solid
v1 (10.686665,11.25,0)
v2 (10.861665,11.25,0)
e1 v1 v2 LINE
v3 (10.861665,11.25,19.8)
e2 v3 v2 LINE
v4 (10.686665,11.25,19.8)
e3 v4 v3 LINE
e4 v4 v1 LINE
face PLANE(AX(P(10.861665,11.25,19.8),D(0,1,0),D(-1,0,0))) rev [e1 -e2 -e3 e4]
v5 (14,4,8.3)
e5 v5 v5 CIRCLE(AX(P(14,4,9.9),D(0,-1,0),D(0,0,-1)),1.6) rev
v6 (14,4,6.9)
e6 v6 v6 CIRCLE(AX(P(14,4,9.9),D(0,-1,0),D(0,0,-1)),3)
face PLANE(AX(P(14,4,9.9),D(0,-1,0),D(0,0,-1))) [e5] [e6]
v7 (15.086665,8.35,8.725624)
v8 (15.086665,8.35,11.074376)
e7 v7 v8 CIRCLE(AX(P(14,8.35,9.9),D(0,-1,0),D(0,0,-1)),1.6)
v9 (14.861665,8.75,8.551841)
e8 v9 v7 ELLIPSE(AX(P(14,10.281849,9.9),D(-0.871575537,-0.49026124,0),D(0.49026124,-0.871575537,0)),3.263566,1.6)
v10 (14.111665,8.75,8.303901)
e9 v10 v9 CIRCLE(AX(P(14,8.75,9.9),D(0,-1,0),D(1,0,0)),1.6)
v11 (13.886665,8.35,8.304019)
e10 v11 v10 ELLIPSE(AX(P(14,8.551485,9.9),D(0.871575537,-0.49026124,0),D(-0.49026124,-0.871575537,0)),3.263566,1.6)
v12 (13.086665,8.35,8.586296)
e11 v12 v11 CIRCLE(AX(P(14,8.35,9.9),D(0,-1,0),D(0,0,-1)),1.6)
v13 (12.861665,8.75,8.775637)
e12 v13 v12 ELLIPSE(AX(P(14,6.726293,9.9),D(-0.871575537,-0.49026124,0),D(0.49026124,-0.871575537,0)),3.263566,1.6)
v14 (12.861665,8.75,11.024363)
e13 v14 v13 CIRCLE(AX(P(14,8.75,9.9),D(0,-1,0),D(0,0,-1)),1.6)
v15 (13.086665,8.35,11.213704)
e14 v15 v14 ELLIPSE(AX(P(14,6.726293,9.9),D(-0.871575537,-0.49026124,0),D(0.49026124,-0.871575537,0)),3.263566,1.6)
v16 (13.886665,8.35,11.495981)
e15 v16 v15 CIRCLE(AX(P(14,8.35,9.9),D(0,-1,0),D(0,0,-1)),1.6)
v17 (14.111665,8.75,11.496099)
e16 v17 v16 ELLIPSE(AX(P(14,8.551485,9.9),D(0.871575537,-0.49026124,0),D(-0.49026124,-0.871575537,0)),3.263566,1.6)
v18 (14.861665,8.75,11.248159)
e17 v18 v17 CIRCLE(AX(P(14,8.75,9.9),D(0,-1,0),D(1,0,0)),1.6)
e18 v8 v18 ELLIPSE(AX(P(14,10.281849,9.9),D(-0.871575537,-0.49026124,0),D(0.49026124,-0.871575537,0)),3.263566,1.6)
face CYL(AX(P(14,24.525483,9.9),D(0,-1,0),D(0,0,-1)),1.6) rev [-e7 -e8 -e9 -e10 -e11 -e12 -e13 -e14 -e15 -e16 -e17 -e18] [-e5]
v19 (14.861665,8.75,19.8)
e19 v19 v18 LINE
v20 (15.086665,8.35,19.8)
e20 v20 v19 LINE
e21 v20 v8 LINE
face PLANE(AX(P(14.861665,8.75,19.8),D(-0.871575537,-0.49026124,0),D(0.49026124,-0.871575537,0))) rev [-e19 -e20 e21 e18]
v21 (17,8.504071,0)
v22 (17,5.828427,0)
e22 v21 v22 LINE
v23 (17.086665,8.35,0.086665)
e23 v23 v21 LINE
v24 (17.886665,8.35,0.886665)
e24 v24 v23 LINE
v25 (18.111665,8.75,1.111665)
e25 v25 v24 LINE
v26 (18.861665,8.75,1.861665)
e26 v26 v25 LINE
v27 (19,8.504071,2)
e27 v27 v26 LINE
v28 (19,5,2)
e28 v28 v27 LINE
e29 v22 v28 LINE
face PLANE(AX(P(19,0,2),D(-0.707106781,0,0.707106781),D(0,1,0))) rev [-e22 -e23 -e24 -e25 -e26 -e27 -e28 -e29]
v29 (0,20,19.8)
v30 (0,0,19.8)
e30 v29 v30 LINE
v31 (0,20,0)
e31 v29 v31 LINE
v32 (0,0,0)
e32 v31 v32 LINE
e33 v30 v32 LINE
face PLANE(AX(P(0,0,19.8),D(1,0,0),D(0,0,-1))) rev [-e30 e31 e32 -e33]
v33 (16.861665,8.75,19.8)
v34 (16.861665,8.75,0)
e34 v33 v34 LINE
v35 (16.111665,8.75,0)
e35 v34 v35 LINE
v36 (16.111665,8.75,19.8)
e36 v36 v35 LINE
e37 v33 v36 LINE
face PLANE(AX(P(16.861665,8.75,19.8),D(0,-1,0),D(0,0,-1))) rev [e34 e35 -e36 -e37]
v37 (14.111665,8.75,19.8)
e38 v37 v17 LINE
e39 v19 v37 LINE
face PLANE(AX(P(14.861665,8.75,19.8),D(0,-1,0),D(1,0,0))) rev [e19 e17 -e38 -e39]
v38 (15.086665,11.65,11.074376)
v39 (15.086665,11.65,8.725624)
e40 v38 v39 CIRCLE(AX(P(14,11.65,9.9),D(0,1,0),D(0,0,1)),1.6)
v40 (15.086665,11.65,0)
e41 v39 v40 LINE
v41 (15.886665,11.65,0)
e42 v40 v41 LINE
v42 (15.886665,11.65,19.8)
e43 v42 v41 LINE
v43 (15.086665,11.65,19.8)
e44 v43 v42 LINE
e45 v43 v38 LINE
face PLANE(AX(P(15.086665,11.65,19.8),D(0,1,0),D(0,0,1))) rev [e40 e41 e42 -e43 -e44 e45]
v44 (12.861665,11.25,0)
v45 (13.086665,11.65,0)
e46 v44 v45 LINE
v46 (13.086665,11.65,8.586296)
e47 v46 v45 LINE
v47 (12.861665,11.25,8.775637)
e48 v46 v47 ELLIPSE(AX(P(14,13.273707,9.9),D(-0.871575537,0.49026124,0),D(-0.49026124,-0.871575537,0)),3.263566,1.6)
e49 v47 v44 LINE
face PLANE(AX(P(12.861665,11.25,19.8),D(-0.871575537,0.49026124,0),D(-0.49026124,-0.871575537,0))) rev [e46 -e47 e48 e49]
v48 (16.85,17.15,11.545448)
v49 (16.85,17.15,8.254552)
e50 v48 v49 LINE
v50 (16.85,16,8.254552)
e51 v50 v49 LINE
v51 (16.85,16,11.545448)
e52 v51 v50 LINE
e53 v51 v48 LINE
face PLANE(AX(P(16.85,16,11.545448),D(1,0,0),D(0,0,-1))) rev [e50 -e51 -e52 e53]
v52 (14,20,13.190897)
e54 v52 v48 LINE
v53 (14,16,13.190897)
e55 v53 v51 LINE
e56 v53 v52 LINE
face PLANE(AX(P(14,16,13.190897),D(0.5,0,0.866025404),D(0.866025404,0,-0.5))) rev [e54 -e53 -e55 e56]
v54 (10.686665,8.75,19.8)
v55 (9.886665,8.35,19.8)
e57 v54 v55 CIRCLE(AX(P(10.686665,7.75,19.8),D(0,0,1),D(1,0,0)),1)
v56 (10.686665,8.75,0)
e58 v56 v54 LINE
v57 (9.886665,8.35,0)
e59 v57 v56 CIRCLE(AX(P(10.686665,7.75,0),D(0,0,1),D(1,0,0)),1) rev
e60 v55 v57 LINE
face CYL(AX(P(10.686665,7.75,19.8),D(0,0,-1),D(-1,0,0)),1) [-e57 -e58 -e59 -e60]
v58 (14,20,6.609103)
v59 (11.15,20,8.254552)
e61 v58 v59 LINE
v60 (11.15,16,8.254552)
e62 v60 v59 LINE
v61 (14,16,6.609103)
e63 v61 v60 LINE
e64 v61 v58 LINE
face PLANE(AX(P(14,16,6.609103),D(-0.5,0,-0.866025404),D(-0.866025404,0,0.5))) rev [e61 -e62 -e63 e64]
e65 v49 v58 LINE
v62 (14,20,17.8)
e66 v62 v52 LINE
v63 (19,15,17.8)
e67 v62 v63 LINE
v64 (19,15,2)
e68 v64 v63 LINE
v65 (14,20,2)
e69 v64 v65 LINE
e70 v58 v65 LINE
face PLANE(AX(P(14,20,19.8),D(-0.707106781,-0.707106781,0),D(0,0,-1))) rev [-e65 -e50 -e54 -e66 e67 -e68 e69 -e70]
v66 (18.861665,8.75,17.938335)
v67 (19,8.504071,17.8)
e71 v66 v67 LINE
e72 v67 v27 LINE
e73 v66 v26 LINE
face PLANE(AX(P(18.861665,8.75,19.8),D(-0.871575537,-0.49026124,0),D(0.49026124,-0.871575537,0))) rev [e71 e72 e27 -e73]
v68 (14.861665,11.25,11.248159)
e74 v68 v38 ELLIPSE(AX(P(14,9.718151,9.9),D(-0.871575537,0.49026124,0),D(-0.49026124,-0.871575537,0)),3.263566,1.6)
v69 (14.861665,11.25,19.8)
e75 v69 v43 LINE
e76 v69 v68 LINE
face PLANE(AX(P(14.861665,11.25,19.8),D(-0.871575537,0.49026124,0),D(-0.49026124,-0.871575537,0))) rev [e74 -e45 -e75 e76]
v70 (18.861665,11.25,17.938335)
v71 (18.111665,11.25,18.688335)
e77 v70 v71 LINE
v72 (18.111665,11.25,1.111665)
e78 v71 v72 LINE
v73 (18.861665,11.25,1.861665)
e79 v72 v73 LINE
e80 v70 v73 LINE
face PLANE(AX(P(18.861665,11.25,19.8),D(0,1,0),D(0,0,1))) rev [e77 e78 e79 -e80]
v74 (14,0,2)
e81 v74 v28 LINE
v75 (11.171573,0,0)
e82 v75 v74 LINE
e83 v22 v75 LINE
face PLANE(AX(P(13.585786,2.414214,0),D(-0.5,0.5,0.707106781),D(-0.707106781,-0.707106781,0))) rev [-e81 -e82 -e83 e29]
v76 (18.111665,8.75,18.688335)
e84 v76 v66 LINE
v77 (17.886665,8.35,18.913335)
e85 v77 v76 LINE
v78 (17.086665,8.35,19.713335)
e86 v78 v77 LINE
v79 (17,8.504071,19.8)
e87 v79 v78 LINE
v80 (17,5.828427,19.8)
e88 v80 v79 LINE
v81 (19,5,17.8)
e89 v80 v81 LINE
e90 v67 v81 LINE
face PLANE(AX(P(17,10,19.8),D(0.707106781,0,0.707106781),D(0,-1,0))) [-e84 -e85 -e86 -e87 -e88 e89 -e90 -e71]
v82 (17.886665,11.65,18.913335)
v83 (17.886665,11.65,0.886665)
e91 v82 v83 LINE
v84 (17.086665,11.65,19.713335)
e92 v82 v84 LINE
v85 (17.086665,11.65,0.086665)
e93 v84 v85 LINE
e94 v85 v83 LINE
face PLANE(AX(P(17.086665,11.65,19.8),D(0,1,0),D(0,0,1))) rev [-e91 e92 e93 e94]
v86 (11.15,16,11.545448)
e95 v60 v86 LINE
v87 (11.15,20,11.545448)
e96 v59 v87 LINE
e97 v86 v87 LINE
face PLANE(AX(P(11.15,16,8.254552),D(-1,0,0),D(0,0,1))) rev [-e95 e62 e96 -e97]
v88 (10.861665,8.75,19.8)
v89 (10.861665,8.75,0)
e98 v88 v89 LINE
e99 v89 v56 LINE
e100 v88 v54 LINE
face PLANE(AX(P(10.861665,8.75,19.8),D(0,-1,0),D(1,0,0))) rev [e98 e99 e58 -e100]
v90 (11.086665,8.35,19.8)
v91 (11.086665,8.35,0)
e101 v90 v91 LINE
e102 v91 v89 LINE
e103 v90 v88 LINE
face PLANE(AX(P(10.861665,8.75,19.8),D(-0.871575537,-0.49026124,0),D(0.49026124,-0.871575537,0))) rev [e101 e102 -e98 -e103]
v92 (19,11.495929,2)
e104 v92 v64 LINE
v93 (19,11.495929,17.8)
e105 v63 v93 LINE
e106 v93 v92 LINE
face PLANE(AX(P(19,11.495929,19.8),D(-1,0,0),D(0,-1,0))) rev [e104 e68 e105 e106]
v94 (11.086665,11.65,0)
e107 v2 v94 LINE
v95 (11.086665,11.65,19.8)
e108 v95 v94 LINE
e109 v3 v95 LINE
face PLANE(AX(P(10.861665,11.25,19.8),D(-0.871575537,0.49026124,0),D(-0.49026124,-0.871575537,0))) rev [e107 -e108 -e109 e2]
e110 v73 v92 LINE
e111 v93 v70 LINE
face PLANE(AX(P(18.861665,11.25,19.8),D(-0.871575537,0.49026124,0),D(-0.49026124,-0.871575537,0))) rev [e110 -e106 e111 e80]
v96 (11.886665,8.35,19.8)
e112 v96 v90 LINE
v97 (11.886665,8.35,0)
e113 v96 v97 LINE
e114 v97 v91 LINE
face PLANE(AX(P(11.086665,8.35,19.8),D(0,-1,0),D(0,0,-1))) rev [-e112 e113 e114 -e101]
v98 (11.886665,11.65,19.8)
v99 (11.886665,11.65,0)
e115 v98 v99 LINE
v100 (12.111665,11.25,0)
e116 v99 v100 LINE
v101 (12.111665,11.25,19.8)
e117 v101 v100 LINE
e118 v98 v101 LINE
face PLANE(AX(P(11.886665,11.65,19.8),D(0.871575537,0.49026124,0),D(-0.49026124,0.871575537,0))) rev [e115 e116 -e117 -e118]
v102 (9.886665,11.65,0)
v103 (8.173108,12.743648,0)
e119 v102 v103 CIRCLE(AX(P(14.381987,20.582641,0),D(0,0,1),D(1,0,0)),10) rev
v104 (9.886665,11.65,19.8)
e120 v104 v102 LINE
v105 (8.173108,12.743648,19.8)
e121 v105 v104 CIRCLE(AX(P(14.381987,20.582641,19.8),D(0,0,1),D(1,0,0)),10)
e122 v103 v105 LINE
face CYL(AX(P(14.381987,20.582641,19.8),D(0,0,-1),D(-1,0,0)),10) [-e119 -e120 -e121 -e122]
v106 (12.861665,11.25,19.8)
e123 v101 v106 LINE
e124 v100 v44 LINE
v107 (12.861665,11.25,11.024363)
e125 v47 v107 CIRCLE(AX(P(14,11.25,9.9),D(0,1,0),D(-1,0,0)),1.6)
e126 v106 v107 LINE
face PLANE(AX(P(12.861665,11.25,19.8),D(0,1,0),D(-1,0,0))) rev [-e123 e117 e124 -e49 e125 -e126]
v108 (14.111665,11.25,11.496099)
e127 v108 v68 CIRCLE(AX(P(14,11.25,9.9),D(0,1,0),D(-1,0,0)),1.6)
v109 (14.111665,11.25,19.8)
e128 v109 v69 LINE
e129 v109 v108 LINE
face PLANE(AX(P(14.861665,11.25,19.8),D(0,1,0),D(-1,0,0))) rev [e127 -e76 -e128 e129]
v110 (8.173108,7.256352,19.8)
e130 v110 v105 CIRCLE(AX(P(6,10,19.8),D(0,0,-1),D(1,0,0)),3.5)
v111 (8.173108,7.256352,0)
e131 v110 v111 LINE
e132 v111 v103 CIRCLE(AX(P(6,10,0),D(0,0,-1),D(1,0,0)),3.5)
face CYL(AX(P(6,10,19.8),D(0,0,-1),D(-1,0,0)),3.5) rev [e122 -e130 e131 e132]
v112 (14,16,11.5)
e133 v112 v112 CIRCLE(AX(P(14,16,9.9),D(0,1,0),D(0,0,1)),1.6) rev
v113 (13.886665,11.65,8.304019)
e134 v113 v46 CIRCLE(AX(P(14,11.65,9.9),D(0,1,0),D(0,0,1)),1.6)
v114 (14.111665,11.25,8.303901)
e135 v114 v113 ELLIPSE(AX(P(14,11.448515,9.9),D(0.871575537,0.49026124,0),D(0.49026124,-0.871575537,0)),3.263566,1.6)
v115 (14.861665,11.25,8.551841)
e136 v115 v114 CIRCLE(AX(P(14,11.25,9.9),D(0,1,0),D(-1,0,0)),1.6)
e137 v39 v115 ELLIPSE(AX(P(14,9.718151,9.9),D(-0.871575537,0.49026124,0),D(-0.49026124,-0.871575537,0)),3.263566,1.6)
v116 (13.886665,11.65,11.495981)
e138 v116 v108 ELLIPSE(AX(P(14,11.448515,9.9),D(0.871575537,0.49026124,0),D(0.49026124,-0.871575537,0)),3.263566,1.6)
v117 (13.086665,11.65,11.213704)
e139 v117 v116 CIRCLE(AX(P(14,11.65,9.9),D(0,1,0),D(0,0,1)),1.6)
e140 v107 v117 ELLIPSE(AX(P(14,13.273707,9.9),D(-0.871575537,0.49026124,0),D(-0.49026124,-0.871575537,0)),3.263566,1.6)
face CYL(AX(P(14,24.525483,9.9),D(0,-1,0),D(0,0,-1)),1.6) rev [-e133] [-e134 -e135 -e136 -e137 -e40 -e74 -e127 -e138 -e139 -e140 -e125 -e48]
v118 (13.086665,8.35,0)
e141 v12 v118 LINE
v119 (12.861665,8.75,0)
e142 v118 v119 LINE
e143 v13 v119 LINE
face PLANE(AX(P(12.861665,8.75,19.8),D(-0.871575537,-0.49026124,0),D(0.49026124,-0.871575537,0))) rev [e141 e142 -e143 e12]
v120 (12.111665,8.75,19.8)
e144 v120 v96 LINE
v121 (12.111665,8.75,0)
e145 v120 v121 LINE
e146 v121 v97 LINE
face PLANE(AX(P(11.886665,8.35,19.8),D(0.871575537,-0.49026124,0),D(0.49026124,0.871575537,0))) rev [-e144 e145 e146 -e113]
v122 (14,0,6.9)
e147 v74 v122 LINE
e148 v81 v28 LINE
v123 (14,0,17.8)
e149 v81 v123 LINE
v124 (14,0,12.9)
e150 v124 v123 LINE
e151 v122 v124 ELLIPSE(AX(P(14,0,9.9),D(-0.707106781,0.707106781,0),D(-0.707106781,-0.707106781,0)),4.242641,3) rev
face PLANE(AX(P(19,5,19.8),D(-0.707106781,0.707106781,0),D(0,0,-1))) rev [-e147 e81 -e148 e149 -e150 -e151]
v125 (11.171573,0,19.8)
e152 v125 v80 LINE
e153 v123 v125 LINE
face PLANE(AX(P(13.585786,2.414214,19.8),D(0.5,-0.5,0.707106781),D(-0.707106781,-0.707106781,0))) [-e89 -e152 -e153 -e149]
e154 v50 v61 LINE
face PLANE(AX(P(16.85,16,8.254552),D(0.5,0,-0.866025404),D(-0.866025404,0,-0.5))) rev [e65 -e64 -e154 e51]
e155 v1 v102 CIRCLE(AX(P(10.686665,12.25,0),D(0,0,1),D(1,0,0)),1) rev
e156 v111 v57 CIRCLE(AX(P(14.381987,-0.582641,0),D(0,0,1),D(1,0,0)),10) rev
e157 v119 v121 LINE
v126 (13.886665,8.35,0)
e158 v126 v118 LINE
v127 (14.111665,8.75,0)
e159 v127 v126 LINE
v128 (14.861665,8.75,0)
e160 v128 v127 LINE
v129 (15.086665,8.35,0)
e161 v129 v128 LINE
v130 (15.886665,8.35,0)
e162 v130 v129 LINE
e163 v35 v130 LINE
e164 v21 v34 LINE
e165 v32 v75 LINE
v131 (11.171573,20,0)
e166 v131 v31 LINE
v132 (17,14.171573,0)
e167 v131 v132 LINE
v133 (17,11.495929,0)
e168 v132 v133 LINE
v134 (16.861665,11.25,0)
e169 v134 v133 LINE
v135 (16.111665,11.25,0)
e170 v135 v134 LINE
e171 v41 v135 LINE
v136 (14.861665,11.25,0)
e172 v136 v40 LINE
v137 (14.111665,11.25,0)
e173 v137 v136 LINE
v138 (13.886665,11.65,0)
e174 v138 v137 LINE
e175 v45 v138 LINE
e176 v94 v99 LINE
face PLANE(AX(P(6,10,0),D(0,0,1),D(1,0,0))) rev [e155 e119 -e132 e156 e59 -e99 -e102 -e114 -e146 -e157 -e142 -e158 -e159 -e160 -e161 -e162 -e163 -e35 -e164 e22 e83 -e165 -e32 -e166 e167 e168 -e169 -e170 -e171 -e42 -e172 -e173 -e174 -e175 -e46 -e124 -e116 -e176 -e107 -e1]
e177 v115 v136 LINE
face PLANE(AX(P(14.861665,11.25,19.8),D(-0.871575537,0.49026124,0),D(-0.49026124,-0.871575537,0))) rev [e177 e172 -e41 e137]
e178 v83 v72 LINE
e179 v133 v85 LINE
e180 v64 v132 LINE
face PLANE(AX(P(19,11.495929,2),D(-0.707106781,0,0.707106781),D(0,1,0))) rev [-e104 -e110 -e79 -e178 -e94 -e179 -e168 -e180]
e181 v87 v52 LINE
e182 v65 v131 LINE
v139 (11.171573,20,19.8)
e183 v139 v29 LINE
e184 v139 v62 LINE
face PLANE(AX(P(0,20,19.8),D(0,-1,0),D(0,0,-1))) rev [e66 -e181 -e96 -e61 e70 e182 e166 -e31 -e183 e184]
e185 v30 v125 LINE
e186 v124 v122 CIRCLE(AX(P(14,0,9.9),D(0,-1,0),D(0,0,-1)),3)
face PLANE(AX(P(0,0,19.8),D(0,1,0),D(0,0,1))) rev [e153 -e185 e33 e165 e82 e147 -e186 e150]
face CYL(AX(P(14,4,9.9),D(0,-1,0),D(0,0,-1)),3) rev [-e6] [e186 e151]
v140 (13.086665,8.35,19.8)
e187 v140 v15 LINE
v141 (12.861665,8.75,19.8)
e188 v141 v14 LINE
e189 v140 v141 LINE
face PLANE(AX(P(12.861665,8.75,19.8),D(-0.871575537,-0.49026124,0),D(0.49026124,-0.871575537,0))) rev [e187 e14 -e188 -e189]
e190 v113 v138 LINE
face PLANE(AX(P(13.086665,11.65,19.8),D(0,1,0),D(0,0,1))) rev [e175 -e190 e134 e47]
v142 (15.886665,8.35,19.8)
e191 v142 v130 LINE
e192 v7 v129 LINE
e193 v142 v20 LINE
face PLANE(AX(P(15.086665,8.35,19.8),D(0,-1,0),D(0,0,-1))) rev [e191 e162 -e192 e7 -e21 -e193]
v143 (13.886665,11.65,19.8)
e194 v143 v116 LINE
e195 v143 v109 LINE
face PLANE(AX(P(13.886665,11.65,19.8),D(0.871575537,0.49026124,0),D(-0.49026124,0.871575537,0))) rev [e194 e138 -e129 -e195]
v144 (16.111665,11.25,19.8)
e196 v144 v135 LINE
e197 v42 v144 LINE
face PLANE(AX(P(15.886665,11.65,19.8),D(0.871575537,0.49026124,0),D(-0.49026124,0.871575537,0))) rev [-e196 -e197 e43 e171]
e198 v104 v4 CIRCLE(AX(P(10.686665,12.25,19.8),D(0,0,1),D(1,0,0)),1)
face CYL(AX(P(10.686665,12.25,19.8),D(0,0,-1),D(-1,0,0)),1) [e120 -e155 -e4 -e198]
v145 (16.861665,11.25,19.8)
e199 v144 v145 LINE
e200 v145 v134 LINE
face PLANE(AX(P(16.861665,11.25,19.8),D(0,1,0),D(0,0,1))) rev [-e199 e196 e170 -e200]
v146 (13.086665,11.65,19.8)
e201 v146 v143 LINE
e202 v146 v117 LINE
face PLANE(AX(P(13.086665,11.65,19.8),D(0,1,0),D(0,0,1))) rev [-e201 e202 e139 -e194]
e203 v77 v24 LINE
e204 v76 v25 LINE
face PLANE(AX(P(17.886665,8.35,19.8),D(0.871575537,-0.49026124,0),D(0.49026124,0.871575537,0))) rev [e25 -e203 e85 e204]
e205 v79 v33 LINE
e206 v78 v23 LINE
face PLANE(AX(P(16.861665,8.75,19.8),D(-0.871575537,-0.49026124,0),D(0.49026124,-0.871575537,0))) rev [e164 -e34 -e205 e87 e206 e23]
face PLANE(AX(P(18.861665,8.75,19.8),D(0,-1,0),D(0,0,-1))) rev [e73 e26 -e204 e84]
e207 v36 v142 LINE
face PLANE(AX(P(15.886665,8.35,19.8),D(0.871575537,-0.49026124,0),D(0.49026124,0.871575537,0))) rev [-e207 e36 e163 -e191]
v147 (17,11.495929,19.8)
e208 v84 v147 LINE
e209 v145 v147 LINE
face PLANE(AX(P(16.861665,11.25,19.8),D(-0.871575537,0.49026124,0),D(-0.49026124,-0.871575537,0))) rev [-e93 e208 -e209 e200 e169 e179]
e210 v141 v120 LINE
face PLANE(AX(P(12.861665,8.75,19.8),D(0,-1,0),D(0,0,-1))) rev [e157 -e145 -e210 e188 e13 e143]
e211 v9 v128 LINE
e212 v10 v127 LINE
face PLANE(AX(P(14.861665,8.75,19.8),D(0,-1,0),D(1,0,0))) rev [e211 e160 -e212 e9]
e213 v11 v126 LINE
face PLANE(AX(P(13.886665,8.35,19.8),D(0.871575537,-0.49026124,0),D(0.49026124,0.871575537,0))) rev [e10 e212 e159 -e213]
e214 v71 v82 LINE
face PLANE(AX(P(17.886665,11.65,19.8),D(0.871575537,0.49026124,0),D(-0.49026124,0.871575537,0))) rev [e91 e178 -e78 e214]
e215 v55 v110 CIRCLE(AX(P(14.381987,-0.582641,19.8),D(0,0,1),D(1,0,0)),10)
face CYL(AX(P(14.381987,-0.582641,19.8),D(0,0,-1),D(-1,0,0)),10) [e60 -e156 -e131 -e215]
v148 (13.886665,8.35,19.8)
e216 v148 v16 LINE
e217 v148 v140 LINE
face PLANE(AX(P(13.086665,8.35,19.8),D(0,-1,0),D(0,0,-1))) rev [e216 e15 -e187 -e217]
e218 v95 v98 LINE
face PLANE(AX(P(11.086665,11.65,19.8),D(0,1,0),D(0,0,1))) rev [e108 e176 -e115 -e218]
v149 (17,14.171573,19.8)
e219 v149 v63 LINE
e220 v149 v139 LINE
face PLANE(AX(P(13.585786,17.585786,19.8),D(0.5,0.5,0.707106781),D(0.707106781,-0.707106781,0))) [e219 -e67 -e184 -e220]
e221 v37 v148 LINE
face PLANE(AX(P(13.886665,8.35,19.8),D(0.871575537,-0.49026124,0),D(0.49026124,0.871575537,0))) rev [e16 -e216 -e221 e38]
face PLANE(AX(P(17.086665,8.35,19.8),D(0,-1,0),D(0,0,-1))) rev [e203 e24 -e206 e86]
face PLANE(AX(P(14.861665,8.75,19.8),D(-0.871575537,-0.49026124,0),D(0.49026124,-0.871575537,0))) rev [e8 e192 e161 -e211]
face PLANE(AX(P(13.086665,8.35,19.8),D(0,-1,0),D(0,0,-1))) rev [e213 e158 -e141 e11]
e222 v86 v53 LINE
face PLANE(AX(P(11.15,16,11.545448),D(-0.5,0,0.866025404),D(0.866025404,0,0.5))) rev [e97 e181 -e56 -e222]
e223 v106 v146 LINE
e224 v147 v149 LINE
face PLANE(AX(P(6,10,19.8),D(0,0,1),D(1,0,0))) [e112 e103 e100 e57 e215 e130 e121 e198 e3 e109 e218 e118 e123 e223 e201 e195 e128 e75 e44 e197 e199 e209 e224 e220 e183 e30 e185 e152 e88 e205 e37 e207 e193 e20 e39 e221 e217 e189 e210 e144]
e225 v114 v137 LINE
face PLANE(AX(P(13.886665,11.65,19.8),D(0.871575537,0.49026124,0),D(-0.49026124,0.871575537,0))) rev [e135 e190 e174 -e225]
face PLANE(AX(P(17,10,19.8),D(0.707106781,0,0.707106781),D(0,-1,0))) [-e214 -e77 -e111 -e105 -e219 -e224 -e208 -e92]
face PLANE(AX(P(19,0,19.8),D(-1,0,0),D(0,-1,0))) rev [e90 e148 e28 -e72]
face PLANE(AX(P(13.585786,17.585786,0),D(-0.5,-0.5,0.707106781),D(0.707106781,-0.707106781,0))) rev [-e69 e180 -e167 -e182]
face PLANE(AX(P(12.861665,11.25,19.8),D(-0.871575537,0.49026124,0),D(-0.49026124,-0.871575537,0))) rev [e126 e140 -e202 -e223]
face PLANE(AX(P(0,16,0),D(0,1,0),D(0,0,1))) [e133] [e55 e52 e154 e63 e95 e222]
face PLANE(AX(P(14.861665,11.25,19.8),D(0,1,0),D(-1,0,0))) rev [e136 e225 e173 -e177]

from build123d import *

# Parameters (mm, degrees)
BOSS_EXTRUDE1_DEPTH = 19.8
FILLET1_R           = 10
FILLET2_R           = 1
CHAMFER1_SIZE       = 5
CUT_EXTRUDE1_REACH  = 35.956
SKETCH2_R           = 1.6
SKETCH3_R           = 3
CUT_EXTRUDE2_DEPTH  = 4
CUT_EXTRUDE3_DEPTH  = 4
CHAMFER2_SIZE       = 2


with BuildPart() as part:
    # Sketch1 → Boss-Extrude1 (new body)
    with BuildSketch(Plane.XY):
        with BuildLine():
            Line((18.861664867, 11.25), (18.111664867, 11.25))
            Line((18.111664867, 11.25), (17.886664867, 11.65))
            Line((17.886664867, 11.65), (17.086664867, 11.65))
            Line((17.086664867, 11.65), (16.861664867, 11.25))
            Line((16.861664867, 11.25), (16.111664867, 11.25))
            Line((16.111664867, 11.25), (15.886664867, 11.65))
            Line((15.886664867, 11.65), (15.086664867, 11.65))
            Line((15.086664867, 11.65), (14.861664867, 11.25))
            Line((14.861664867, 11.25), (14.111664867, 11.25))
            Line((14.111664867, 11.25), (13.886664867, 11.65))
            Line((13.886664867, 11.65), (13.086664867, 11.65))
            Line((13.086664867, 11.65), (12.861664867, 11.25))
            Line((12.861664867, 11.25), (12.111664867, 11.25))
            Line((12.111664867, 11.25), (11.886664867, 11.65))
            Line((11.886664867, 11.65), (11.086664867, 11.65))
            Line((11.086664867, 11.65), (10.861664867, 11.25))
            Line((10.861664867, 11.25), (10.111664867, 11.25))
            Line((10.111664867, 11.25), (9.886664867, 11.65))
            Line((9.886664867, 11.65), (9.086664867, 11.65))
            ThreePointArc((9.086664867, 11.65), (2.5, 10), (9.086664867, 8.35))
            Line((9.086664867, 8.35), (9.886664867, 8.35))
            Line((9.886664867, 8.35), (10.111664867, 8.75))
            Line((10.111664867, 8.75), (10.861664867, 8.75))
            Line((10.861664867, 8.75), (11.086664867, 8.35))
            Line((11.086664867, 8.35), (11.886664867, 8.35))
            Line((11.886664867, 8.35), (12.111664867, 8.75))
            Line((12.111664867, 8.75), (12.861664867, 8.75))
            Line((12.861664867, 8.75), (13.086664867, 8.35))
            Line((13.086664867, 8.35), (13.886664867, 8.35))
            Line((13.886664867, 8.35), (14.111664867, 8.75))
            Line((14.111664867, 8.75), (14.861664867, 8.75))
            Line((14.861664867, 8.75), (15.086664867, 8.35))
            Line((15.086664867, 8.35), (15.886664867, 8.35))
            Line((15.886664867, 8.35), (16.111664867, 8.75))
            Line((16.111664867, 8.75), (16.861664867, 8.75))
            Line((16.861664867, 8.75), (17.086664867, 8.35))
            Line((17.086664867, 8.35), (17.886664867, 8.35))
            Line((17.886664867, 8.35), (18.111664867, 8.75))
            Line((18.111664867, 8.75), (18.861664867, 8.75))
            Line((18.861664867, 8.75), (19, 8.504070874))
            Line((19, 8.504070874), (19, 0))
            Line((19, 0), (0, 0))
            Line((0, 0), (0, 20))
            Line((0, 20), (19, 20))
            Line((19, 20), (19, 11.495929126))
            Line((19, 11.495929126), (18.861664867, 11.25))
        make_face()
    extrude(amount=BOSS_EXTRUDE1_DEPTH)

    # Fillet1
    # the kernel refuses this fillet: 10 mm, written as the material it takes off along each edge
    with BuildSketch(Plane(origin=(9.086664867, 8.35, -3.562523753), x_dir=(1, 0, 0), z_dir=(0, 0, 1))) as fillet1_piece_1:
        with BuildLine():
            CenterArc((5.295321975, -8.932641286), FILLET1_R, 116.713674189, 11.667329514)
            Line((-0.913557167, -1.093647741), (-1.03773475, -0.93686787))
            ThreePointArc((-1.03773475, -0.93686787), (-0.554023827, -0.465591965), (-0.17638085, 0.094285714))
            Line((-0.17638085, 0.094285714), (0, 0.2))
            ThreePointArc((0, 0.2), (0.4, 0.2), (0.710093561, 0.178652826))
            Line((0.710093561, 0.178652826), (0.8, 0))
        make_face()
    extrude(amount=26.925047506, mode=Mode.SUBTRACT)
    with BuildSketch(Plane(origin=(9.086664867, 11.65, -3.562523753), x_dir=(1, 0, 0), z_dir=(0, 0, 1))) as fillet1_piece_2:
        with BuildLine():
            CenterArc((5.295321975, 8.932641286), FILLET1_R, 231.618996297, 11.667329514)
            Line((-0.913557167, 1.093647741), (-1.03773475, 0.93686787))
            ThreePointArc((-1.03773475, 0.93686787), (-0.554023827, 0.465591965), (-0.17638085, -0.094285714))
            Line((-0.17638085, -0.094285714), (0, -0.2))
            ThreePointArc((0, -0.2), (0.4, -0.2), (0.710093561, -0.178652826))
            Line((0.710093561, -0.178652826), (0.8, 0))
        make_face()
    extrude(amount=26.925047506, mode=Mode.SUBTRACT)

    # Fillet2
    # the kernel refuses this fillet: 1 mm, written as the material it takes off along each edge
    with BuildSketch(Plane(origin=(10.111664867, 8.75, -1.4375), x_dir=(-0.4902612396325597, -0.8715755371245488, 0), z_dir=(0, 0, 1))) as fillet2_piece_1:
        with BuildLine():
            CenterArc((0.589675324, 0.991417173), FILLET2_R, 209.357753543, 53.130102354)
            Line((-0.281900213, 0.501155934), (-0.299331724, 0.491350709))
            Line((-0.299331724, 0.491350709), (-0.017431511, -0.009805225))
            Line((-0.017431511, -0.009805225), (0, -0.02))
            ThreePointArc((0, -0.02), (0.229469497, -0.02), (0.456324267, -0.019828343))
            Line((0.456324267, -0.019828343), (0.458938994, 0))
        make_face()
    extrude(amount=22.675, mode=Mode.SUBTRACT)
    with BuildSketch(Plane(origin=(10.111664867, 11.25, -1.4375), x_dir=(-0.4902612396325682, 0.8715755371245442, 0), z_dir=(0, 0, 1))) as fillet2_piece_2:
        with BuildLine():
            CenterArc((0.589675324, -0.991417173), FILLET2_R, 97.512144103, 53.130102354)
            Line((-0.281900213, -0.501155934), (-0.299331724, -0.491350709))
            Line((-0.299331724, -0.491350709), (-0.017431511, 0.009805225))
            Line((-0.017431511, 0.009805225), (0, 0.02))
            ThreePointArc((0, 0.02), (0.229469497, 0.02), (0.456324267, 0.019828343))
            Line((0.456324267, 0.019828343), (0.458938994, 0))
        make_face()
    extrude(amount=22.675, mode=Mode.SUBTRACT)

    # Chamfer1
    chamfer1_edges = [part.edges().sort_by_distance(p)[0] for p in [
        (19, 20, 9.9),
        (19, 0, 9.9),
    ]]
    chamfer(chamfer1_edges, length=CHAMFER1_SIZE)

    # Cut-Extrude1: up to this face of the body (flat: up to its plane)
    cut_extrude1_end = Plane(part.part.faces().sort_by_distance((7, 20, 9.9))[0])
    # Sketch2 → Cut-Extrude1 (cut, up to the picked face)
    with BuildSketch(Plane.XZ, mode=Mode.PRIVATE) as cut_extrude1_sk1:
        with Locations(Location((14, 9.9, 0), (0, 0, 270))):
            Circle(SKETCH2_R)
    cut_extrude1_tool1 = split(extrude(cut_extrude1_sk1.sketch, amount=-CUT_EXTRUDE1_REACH, mode=Mode.PRIVATE), bisect_by=cut_extrude1_end, keep=Keep.BOTH, mode=Mode.PRIVATE)
    add(cut_extrude1_tool1.solids().sort_by(Axis((14, 0, 9.9), (0, 1, 0)))[0], mode=Mode.SUBTRACT)

    # Sketch3 → Cut-Extrude2 (cut)
    with BuildSketch(Plane.XZ):
        with Locations(Location((14, 9.9, 0), (0, 0, 270))):
            Circle(SKETCH3_R)
    extrude(amount=-CUT_EXTRUDE2_DEPTH, mode=Mode.SUBTRACT)

    # Sketch4 → Cut-Extrude3 (cut)
    with BuildSketch(Plane(origin=(0, 20, 0), x_dir=(1, 0, 0), z_dir=(0, 1, 0))):
        Polygon((11.15, -8.254551733), (11.15, -11.545448267), (14, -13.190896534), (16.85, -11.545448267), (16.85, -8.254551733), (14, -6.609103466), align=None)
    extrude(amount=-CUT_EXTRUDE3_DEPTH, mode=Mode.SUBTRACT)

    # Chamfer2
    chamfer2_edges = [part.edges().sort_by_distance(p)[0] for p in [
        (16.5, 2.5, 0),
        (19, 6.752035437, 0),
        (16.5, 17.5, 0),
        (19, 13.247964563, 0),
        (16.5, 17.5, 19.8),
        (19, 13.247964563, 19.8),
        (19, 6.752035437, 19.8),
        (16.5, 2.5, 19.8),
    ]]
    chamfer(chamfer2_edges, length=CHAMFER2_SIZE)


solid = part.part
